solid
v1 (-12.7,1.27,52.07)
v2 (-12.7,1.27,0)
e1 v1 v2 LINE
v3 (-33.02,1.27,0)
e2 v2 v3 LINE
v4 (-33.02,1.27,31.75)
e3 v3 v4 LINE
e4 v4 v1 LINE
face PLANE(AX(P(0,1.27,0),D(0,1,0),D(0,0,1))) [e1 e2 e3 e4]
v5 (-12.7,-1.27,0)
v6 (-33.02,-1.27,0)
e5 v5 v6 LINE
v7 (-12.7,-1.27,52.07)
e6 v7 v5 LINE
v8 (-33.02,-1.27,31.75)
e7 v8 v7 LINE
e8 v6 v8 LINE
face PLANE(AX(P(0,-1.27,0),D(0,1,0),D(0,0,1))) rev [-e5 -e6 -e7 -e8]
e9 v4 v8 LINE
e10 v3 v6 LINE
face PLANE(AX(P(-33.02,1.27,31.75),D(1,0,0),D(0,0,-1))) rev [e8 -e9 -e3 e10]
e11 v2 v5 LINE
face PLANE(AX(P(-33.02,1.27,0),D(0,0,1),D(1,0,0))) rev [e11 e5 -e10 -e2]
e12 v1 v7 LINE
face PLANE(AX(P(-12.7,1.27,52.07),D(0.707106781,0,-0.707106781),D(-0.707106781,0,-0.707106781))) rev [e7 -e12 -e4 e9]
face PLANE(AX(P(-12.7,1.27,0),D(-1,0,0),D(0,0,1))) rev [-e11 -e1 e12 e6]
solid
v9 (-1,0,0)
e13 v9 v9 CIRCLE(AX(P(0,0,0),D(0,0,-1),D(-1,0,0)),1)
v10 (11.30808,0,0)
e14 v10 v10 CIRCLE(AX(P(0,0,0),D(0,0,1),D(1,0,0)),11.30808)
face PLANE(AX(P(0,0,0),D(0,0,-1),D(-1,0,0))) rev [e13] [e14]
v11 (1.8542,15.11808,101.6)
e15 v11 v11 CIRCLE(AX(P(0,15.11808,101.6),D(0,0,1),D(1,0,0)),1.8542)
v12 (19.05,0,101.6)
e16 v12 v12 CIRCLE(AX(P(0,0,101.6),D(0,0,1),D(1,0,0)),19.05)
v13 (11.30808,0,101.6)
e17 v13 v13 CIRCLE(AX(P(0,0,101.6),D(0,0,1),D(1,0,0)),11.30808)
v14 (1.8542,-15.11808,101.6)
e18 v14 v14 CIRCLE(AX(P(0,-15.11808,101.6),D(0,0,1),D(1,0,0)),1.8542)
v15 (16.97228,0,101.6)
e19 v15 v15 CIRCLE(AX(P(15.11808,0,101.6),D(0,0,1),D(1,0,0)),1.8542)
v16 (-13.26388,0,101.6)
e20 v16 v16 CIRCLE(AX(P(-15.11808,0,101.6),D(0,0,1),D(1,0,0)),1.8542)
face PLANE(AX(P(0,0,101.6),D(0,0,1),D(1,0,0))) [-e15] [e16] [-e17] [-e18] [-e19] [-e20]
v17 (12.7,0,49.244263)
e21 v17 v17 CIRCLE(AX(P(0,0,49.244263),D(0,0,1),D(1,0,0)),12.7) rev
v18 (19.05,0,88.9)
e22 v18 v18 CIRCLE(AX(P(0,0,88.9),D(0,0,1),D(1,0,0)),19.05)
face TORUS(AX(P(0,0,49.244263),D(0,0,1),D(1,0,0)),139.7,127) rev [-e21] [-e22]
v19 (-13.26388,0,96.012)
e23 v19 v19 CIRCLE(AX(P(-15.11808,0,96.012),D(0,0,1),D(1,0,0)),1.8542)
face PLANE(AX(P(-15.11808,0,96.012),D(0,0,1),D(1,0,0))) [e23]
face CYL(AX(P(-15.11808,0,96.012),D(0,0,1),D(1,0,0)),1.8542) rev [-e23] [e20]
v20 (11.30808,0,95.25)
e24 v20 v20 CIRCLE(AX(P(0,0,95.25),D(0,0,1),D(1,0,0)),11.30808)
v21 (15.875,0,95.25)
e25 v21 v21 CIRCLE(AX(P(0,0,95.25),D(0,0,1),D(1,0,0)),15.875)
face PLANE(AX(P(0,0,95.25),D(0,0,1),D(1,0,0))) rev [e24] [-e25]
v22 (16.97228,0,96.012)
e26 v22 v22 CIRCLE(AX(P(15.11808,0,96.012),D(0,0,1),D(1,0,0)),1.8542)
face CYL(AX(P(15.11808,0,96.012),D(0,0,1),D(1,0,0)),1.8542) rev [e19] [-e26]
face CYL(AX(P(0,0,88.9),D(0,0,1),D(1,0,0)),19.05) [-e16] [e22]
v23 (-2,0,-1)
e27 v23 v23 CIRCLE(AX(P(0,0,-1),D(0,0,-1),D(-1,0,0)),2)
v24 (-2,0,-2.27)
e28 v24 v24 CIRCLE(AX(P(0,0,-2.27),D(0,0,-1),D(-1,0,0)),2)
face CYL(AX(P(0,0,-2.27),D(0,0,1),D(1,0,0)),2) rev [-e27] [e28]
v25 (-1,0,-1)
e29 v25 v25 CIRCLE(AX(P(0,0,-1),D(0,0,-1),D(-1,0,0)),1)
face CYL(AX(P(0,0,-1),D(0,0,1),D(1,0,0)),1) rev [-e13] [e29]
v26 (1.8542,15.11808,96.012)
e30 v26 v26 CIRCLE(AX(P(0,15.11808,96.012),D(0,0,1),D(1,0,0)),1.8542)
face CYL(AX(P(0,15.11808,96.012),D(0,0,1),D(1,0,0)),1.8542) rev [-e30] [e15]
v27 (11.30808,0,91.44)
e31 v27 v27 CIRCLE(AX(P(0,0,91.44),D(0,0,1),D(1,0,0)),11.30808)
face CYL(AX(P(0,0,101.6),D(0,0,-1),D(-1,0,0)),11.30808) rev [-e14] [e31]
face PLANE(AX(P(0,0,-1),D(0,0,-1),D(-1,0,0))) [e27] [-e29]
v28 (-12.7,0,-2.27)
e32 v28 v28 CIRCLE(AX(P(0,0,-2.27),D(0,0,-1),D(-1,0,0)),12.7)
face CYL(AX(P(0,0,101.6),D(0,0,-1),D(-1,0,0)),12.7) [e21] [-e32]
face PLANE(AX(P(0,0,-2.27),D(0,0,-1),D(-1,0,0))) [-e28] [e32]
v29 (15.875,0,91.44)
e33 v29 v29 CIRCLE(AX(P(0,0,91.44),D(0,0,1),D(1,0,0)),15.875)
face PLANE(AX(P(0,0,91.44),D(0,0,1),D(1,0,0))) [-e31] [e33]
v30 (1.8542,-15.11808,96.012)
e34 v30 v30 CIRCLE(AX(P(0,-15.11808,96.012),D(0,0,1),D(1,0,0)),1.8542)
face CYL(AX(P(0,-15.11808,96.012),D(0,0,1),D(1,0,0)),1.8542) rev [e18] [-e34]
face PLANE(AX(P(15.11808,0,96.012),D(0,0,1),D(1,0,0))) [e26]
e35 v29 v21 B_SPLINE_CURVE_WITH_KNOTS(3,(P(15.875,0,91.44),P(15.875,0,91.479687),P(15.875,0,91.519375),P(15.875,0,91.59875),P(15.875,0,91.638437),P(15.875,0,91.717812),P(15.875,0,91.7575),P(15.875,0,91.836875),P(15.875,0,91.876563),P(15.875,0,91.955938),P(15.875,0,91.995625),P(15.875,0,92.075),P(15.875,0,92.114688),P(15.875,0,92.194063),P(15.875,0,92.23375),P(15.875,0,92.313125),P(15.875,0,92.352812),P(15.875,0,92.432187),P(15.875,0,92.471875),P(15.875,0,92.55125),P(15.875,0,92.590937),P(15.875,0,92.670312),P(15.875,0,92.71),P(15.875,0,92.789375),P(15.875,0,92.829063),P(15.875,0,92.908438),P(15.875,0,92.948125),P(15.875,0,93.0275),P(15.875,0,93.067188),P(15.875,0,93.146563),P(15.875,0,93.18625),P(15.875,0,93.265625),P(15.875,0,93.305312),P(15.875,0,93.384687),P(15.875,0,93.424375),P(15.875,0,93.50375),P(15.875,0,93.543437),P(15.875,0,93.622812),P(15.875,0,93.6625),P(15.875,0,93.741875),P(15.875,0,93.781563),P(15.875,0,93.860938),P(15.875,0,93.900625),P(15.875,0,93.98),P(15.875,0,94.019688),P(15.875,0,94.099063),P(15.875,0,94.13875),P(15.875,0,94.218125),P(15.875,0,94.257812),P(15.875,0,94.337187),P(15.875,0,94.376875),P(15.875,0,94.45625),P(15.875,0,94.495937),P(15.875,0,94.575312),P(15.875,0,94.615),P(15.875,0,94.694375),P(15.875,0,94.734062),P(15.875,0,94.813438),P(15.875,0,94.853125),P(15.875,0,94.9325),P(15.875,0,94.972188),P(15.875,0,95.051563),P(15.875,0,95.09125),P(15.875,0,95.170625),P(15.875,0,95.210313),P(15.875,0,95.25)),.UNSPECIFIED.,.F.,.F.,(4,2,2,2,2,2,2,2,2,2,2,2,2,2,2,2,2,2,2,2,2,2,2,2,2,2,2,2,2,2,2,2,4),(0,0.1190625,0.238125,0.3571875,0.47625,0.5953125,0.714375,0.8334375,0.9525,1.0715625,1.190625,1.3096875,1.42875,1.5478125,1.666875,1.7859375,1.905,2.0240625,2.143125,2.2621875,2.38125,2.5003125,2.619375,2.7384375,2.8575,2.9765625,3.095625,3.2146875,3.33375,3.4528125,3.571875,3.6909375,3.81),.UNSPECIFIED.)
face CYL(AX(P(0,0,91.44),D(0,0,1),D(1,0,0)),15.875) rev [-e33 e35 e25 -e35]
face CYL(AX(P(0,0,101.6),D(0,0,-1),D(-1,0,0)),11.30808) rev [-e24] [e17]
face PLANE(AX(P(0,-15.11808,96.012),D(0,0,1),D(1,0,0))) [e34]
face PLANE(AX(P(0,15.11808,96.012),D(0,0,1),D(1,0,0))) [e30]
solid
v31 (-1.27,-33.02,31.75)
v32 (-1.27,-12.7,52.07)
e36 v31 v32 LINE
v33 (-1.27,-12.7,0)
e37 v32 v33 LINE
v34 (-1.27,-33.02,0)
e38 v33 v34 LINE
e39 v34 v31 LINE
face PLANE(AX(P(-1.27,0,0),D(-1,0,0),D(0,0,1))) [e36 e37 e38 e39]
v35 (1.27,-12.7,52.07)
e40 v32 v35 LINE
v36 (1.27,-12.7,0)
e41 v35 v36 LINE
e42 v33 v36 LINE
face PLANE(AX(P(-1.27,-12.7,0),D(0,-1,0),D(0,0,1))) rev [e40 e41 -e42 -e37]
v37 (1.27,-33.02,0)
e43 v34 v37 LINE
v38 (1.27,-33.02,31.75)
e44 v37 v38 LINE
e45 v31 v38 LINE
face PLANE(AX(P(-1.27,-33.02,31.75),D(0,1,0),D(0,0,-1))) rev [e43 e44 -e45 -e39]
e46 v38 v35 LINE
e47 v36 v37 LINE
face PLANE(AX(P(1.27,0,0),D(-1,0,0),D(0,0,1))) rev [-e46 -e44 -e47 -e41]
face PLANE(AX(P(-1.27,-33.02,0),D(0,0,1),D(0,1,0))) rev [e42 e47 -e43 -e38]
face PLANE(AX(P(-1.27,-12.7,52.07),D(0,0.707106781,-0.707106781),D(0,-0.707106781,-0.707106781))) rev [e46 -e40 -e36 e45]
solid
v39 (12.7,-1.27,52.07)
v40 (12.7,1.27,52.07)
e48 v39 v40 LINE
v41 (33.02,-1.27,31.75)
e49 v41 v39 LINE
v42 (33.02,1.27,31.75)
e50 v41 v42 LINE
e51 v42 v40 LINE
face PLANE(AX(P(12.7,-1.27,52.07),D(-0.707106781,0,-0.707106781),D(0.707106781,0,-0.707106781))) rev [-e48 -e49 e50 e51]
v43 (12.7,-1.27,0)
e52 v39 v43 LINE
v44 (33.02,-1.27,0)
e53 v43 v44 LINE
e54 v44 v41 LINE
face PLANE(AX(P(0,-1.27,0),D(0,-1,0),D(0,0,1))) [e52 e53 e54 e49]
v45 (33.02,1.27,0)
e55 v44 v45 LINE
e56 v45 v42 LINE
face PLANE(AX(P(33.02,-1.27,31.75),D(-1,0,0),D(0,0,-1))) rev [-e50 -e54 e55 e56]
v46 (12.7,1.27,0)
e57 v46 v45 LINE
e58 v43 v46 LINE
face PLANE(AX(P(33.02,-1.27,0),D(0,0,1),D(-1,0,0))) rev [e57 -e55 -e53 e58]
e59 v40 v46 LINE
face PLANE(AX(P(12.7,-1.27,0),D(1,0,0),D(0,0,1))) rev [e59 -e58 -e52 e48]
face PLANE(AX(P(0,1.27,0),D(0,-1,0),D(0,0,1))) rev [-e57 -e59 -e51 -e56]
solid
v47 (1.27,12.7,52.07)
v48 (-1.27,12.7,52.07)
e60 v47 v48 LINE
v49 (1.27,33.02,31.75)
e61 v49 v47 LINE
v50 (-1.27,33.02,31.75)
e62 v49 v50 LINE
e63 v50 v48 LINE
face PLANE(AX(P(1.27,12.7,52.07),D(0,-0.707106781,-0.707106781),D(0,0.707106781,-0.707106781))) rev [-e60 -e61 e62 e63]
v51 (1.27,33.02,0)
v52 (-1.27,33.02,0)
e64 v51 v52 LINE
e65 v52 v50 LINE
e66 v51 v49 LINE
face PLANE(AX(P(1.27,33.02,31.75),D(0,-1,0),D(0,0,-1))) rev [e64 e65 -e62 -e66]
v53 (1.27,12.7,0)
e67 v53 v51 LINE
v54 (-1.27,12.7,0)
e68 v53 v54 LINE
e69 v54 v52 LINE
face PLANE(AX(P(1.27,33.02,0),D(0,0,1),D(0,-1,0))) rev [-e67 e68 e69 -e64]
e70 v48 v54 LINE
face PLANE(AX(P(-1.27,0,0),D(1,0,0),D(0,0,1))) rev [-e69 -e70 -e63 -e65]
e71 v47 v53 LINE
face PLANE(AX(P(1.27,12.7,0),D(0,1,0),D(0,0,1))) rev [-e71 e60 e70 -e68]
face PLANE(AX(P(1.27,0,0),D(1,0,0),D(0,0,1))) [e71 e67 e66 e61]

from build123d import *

# Parameters (mm, degrees)
SKETCH1_R              = 12.7
SKETCH1_R_2            = 11.30808
BOSS_EXTRUDE1_DEPTH    = 101.6
BOSS_EXTRUDE4_DEPTH    = 1.27
CIRPATTERN6_COUNT      = 4
BOSS_EXTRUDE5_START    = 1
SKETCH3_R              = 12.7
SKETCH3_R_2            = 1
BOSS_EXTRUDE5_DEPTH    = 1
O_RING_START           = 1.27
SKETCH4_R              = 12.7
SKETCH4_R_2            = 2
O_RING_BODY_HOLD_DEPTH = 1.27
BOSS_EXTRUDE8_START    = -12.7
SKETCH37_R             = 19.05
SKETCH37_R_2           = 11.30808
BOSS_EXTRUDE8_DEPTH    = 12.7
SKETCH38_R             = 1.8542
CUT_EXTRUDE1_DEPTH     = 5.588
SKETCH39_R             = 15.875
SKETCH39_R_2           = 10.16
CUT_EXTRUDE2_DEPTH     = 3.81


with BuildPart() as part:
    # Sketch1 → Boss-Extrude1 (new body)
    with BuildSketch(Plane.XY):
        Circle(SKETCH1_R)
        Circle(SKETCH1_R_2, mode=Mode.SUBTRACT)
    extrude(amount=BOSS_EXTRUDE1_DEPTH)

    # Sketch3 → Boss-Extrude5 (add)
    with BuildSketch(Plane(origin=(0, 0, 0), x_dir=(-1, 0, 0), z_dir=(0, 0, -1)).offset(BOSS_EXTRUDE5_START)):
        Circle(SKETCH3_R)
        Circle(SKETCH3_R_2, mode=Mode.SUBTRACT)
    extrude(amount=-BOSS_EXTRUDE5_DEPTH)

    # Sketch4 → O-Ring Body Hold (add)
    with BuildSketch(Plane(origin=(0, 0, -1), x_dir=(-1, 0, 0), z_dir=(0, 0, -1)).offset(O_RING_START)):
        Circle(SKETCH4_R)
        Circle(SKETCH4_R_2, mode=Mode.SUBTRACT)
    extrude(amount=-O_RING_BODY_HOLD_DEPTH)

    # Sketch37 → Boss-Extrude8 (add)
    with BuildSketch(Plane.XY.offset(101.6).offset(BOSS_EXTRUDE8_START)):
        Circle(SKETCH37_R)
        Circle(SKETCH37_R_2, mode=Mode.SUBTRACT)
    extrude(amount=BOSS_EXTRUDE8_DEPTH)

    # Sketch38 → Cut-Extrude1 (cut)
    with BuildSketch(Plane.XY.offset(101.6)):
        with Locations((-15.11808, 0)):
            Circle(SKETCH38_R)
        with Locations((0, 15.11808)):
            Circle(SKETCH38_R)
        with Locations((15.11808, 0)):
            Circle(SKETCH38_R)
        with Locations((0, -15.11808)):
            Circle(SKETCH38_R)
    extrude(amount=-CUT_EXTRUDE1_DEPTH, mode=Mode.SUBTRACT)

    # Fillet2: read off the stored shape, not the designer's step
    # Fillet2 outline → Fillet2 (revolve)
    with BuildSketch(Plane.XZ):
        with BuildLine():
            ThreePointArc((12.7, 49.24426271), (14.297547871, 69.324725852), (19.05, 88.9))
            Line((19.05, 88.9), (12.7, 88.9))
            Line((12.7, 88.9), (12.7, 49.24426271))
        make_face()
    revolve(axis=Axis((0, 0, 0), (0, 0, 1)))

    # Sketch39 → Cut-Extrude2 (cut)
    with BuildSketch(Plane.XY.offset(95.25)):
        Circle(SKETCH39_R)
        Circle(SKETCH39_R_2, mode=Mode.SUBTRACT)
    extrude(amount=-CUT_EXTRUDE2_DEPTH, mode=Mode.SUBTRACT)


with BuildPart() as body_2:
    # Sketch2 → Boss-Extrude4 (new, symmetric)
    with BuildSketch(Plane(origin=(0, 0, 0), x_dir=(1, 0, 0), z_dir=(0, 1, 0))):
        Polygon((-12.7, -52.07), (-33.02, -31.75), (-33.02, 0), (-12.7, 0), align=None)
    extrude(amount=BOSS_EXTRUDE4_DEPTH, both=True)


with BuildPart() as cirpattern6_1:
    # CirPattern6: pattern copy
    add(body_2.part.rotate(Axis((0, 0, 0), (0, 0, 1)), 1 * 360 / CIRPATTERN6_COUNT))


with BuildPart() as cirpattern6_2:
    # CirPattern6: pattern copy
    add(body_2.part.rotate(Axis((0, 0, 0), (0, 0, 1)), 2 * 360 / CIRPATTERN6_COUNT))


with BuildPart() as cirpattern6_3:
    # CirPattern6: pattern copy
    add(body_2.part.rotate(Axis((0, 0, 0), (0, 0, 1)), 3 * 360 / CIRPATTERN6_COUNT))


solid = Compound([part.part, body_2.part, cirpattern6_1.part, cirpattern6_2.part, cirpattern6_3.part])
